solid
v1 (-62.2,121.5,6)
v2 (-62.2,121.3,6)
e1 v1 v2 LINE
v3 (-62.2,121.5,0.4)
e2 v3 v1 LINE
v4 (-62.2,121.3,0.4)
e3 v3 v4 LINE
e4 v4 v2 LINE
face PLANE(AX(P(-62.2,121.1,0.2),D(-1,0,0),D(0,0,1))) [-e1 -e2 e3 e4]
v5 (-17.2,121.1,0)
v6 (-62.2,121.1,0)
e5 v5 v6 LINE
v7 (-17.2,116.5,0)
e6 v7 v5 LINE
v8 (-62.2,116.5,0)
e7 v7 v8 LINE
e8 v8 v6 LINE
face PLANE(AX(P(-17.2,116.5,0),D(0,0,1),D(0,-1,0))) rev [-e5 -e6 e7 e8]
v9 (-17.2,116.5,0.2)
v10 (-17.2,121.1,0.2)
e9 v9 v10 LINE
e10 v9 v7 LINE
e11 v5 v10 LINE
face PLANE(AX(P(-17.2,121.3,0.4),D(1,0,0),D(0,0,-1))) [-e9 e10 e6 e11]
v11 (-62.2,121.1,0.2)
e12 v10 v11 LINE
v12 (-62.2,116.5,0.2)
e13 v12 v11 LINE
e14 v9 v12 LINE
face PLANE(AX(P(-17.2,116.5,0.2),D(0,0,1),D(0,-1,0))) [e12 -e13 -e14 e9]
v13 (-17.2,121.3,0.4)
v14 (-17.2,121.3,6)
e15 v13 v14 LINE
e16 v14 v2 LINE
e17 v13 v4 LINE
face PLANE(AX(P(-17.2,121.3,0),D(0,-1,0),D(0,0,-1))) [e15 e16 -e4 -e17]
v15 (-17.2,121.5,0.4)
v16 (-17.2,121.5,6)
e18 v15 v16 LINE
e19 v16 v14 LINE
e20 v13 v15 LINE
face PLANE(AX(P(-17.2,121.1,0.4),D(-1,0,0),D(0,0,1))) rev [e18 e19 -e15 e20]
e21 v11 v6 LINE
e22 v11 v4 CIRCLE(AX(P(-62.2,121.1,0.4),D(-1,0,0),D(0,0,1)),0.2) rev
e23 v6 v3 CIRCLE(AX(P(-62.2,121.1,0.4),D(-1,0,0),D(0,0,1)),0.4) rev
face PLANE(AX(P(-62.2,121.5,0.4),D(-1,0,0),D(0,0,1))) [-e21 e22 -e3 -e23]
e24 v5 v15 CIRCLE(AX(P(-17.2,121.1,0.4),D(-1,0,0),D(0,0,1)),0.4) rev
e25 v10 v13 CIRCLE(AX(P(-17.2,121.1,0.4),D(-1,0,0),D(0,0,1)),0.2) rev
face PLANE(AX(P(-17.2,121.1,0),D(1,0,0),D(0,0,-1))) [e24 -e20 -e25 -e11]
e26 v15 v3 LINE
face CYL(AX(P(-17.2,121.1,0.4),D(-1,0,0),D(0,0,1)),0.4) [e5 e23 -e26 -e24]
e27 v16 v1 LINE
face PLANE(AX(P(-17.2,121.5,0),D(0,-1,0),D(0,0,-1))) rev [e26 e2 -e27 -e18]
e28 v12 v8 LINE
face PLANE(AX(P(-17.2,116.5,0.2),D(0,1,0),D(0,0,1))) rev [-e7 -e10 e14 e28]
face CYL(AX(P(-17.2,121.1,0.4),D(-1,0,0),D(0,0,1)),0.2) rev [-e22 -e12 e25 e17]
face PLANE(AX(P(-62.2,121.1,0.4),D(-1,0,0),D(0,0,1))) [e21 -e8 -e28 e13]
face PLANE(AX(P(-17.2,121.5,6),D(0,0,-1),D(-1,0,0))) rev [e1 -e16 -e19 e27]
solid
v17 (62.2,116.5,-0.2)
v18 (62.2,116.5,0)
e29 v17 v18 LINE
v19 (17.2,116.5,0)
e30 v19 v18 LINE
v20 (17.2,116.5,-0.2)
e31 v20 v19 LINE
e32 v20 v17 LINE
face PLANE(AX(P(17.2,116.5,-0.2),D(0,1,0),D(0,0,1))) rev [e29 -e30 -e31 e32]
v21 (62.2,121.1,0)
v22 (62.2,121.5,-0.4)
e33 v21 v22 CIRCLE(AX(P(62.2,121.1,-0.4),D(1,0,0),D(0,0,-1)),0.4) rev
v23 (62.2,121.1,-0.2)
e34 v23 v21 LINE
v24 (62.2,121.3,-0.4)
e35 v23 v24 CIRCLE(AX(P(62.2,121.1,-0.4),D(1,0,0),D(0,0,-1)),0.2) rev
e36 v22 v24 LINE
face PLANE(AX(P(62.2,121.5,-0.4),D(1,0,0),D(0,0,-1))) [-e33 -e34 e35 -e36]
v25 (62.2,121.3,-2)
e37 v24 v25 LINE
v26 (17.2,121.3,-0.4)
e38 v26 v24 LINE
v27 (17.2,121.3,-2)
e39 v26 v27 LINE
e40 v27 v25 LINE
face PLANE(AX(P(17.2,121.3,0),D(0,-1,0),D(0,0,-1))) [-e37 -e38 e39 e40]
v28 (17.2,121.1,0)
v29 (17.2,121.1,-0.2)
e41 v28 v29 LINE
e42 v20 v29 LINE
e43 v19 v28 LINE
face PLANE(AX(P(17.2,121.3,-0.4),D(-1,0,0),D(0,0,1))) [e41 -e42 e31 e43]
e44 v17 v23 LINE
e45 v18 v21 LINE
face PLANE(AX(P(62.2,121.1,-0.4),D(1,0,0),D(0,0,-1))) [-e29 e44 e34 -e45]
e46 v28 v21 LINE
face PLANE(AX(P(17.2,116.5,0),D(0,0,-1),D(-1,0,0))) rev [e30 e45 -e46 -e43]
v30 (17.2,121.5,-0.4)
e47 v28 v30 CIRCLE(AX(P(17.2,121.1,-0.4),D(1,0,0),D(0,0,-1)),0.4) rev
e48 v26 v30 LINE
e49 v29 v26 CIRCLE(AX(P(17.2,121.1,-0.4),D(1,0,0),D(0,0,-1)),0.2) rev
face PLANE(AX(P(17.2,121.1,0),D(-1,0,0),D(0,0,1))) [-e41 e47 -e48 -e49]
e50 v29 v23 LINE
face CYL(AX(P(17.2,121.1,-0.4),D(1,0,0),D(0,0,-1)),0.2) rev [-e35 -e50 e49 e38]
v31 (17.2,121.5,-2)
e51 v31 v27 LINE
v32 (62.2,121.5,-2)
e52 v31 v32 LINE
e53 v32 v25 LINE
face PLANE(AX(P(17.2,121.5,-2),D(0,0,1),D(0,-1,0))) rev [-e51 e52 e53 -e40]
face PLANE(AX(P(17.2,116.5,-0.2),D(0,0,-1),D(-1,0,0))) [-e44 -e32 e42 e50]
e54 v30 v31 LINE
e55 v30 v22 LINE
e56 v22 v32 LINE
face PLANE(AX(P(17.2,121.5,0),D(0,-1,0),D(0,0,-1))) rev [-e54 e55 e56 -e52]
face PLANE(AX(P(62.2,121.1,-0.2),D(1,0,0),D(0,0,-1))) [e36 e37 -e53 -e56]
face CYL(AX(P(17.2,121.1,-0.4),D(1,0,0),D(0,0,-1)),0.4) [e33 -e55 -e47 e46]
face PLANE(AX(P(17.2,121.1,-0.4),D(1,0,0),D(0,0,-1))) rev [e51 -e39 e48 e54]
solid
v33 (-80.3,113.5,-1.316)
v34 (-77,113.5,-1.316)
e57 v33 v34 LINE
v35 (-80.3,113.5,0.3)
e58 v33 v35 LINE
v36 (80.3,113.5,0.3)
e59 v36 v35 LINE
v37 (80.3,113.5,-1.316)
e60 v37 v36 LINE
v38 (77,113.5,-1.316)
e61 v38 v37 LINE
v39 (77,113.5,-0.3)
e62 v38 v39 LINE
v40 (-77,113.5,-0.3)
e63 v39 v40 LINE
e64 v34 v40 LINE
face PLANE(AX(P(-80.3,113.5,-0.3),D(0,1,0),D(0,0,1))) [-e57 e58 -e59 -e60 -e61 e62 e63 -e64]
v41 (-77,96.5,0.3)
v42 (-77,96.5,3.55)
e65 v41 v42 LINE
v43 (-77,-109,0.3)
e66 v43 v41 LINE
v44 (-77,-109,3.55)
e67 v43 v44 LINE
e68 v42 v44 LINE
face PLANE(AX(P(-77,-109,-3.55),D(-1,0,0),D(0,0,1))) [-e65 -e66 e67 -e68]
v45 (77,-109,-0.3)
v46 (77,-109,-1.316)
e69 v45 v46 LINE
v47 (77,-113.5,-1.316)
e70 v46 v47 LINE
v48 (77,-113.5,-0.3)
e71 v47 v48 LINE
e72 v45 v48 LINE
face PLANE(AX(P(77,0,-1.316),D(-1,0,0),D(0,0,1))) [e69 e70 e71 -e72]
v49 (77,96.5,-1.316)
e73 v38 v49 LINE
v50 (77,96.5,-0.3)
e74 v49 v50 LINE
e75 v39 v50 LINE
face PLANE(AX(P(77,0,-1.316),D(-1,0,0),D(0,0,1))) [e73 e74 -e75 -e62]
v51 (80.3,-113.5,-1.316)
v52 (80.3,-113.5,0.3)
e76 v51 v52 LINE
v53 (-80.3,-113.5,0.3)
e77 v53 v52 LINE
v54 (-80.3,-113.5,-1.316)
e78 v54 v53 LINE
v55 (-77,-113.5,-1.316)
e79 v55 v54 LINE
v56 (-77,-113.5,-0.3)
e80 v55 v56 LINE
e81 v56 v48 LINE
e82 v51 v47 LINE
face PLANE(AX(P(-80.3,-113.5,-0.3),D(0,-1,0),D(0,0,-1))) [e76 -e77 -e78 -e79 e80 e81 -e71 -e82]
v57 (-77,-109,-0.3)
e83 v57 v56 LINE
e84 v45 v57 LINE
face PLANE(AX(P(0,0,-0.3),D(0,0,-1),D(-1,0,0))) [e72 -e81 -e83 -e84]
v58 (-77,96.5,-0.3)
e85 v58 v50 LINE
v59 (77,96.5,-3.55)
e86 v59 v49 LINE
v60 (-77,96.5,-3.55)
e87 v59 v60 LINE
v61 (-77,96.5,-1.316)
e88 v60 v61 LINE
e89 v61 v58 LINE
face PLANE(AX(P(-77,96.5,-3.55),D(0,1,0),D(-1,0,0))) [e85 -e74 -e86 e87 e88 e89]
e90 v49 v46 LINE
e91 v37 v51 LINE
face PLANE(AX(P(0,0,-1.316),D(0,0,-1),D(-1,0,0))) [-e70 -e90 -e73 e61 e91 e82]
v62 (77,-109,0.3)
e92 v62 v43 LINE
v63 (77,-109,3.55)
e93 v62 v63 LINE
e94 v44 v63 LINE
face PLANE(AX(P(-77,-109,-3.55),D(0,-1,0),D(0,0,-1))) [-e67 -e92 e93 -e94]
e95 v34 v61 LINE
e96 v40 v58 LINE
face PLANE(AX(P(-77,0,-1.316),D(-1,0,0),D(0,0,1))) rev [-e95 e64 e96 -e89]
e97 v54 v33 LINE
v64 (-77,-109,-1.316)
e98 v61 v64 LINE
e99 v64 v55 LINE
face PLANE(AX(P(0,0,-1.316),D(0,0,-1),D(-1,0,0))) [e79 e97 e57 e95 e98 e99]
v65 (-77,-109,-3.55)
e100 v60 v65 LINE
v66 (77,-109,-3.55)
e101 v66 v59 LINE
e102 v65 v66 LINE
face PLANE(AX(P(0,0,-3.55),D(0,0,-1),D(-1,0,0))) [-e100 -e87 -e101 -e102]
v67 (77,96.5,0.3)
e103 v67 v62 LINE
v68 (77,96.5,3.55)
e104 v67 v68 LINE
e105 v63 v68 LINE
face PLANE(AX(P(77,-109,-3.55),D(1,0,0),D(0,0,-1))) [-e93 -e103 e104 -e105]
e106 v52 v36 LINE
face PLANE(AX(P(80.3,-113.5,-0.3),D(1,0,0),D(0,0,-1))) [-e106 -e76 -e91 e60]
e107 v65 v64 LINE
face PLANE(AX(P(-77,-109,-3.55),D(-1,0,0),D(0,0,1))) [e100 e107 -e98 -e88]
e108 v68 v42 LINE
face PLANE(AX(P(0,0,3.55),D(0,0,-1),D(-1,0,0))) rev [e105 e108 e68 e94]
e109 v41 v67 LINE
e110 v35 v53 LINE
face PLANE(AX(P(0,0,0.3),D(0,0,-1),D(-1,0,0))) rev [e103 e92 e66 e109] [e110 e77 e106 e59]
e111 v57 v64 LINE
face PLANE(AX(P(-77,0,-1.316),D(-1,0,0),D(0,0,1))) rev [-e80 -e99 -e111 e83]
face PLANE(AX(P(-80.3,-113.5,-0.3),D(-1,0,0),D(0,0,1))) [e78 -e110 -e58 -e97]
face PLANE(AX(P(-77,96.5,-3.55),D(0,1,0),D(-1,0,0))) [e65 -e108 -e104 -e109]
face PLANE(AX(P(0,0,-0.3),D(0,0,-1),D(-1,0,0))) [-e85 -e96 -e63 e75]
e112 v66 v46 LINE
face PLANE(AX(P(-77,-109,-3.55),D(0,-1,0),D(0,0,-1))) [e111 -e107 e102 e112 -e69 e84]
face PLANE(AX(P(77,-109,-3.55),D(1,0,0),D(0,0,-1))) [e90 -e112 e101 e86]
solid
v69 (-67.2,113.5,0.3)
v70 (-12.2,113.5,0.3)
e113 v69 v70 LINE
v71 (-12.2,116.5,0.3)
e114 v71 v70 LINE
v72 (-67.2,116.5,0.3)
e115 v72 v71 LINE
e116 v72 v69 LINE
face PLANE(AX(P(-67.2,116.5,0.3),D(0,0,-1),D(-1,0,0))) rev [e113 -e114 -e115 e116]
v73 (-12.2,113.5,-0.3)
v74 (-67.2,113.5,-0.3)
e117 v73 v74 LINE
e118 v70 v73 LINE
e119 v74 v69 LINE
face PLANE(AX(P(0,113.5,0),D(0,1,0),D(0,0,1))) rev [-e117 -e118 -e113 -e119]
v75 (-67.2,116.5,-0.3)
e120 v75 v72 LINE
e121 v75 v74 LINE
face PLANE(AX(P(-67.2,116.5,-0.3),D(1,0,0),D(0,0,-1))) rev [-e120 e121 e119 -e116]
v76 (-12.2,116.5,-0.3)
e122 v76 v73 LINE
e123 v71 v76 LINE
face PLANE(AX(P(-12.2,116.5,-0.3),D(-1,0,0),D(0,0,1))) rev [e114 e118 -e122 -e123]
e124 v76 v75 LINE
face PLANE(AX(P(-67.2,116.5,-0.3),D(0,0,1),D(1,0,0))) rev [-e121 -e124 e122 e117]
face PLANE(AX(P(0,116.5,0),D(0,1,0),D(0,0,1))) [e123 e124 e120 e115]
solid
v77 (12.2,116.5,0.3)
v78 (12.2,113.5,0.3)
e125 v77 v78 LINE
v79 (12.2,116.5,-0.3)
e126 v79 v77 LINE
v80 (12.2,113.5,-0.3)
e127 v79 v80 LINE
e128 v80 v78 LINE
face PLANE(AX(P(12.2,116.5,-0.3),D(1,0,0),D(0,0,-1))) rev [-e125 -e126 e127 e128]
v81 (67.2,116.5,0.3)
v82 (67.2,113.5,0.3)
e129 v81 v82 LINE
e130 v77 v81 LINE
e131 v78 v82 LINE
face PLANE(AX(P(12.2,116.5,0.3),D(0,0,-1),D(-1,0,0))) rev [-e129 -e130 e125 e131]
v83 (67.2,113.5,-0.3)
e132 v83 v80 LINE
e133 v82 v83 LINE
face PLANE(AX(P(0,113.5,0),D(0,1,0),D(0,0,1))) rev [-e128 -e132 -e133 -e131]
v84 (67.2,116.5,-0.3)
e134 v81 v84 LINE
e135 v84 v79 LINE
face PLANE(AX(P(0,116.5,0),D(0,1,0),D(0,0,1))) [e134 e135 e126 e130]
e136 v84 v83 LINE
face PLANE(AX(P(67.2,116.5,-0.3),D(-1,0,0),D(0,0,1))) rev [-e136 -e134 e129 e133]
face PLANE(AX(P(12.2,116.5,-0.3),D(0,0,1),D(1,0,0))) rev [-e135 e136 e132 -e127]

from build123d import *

# Parameters (mm, degrees)
INSULATION_DEPTH      = 0.3
INSULATION_DEPTH_BACK = 0.3
SKETCH1_W             = 160.6
SKETCH1_H             = 227
MAIN_BODY_DEPTH       = 3.55
MAIN_BODY_DEPTH_BACK  = 3.55
SKETCH2_W             = 154
SKETCH2_H             = 205.5
SIDE_FOLDS_DEPTH      = 1.016
SKETCH114_W           = 55
SKETCH114_H           = 0.6
BOSS_EXTRUDE1_DEPTH   = 3
BOSS_EXTRUDE1_2_DEPTH = 3
BASE_FLANGE1_DEPTH    = 45
BASE_FLANGE2_DEPTH    = 45


# Sheet-metal steps are written as plain solids
with BuildPart() as part:
    # Sketch1 → Insulation (new, two sides: drawn at the far end of the back side and taken through both)
    with BuildSketch(Plane.XY.offset(-INSULATION_DEPTH_BACK)):
        Rectangle(SKETCH1_W, SKETCH1_H)
    extrude(amount=INSULATION_DEPTH + INSULATION_DEPTH_BACK)

    # Sketch2 → Main Body (add, two sides: drawn at the far end of the back side and taken through both)
    with BuildSketch(Plane.XY.offset(-MAIN_BODY_DEPTH_BACK)):
        with Locations((0, -6.25)):
            Rectangle(SKETCH2_W, SKETCH2_H)
    extrude(amount=MAIN_BODY_DEPTH + MAIN_BODY_DEPTH_BACK)

    # Sketch5 → Side Folds (add)
    with BuildSketch(Plane(origin=(0, 0, -0.3), x_dir=(-1, 0, 0), z_dir=(0, 0, -1))):
        Polygon((-77, -109), (-77, 96.5), (-77, 113.5), (-80.3, 113.5), (-80.3, -113.5), (-77, -113.5), align=None)
        Polygon((77, 113.5), (77, 96.5), (77, -109), (77, -113.5), (80.3, -113.5), (80.3, 113.5), align=None)
    extrude(amount=SIDE_FOLDS_DEPTH)


with BuildPart() as body_2:
    # Sketch114 → Boss-Extrude1 (new body)
    with BuildSketch(Plane(origin=(0, 113.5, 0), x_dir=(1, 0, 0), z_dir=(0, 1, 0))):
        with Locations((-39.7, 0)):
            Rectangle(SKETCH114_W, SKETCH114_H)
    extrude(amount=BOSS_EXTRUDE1_DEPTH)


with BuildPart() as body_3:
    # Sketch114 → Boss-Extrude1 2 (new body)
    with BuildSketch(Plane(origin=(0, 113.5, 0), x_dir=(1, 0, 0), z_dir=(0, 1, 0))):
        with Locations((39.7, 0)):
            Rectangle(SKETCH114_W, SKETCH114_H)
    extrude(amount=BOSS_EXTRUDE1_2_DEPTH)


with BuildPart() as body_4:
    # Sketch115 → Base-Flange1 (new body)
    with BuildSketch(Plane.ZY.offset(62.2)):
        with BuildLine():
            Line((0, 116.5), (0, 121.1))
            ThreePointArc((0, 121.1), (0.117157288, 121.382842712), (0.4, 121.5))
            Line((0.4, 121.5), (6, 121.5))
            Line((6, 121.5), (6, 121.3))
            Line((6, 121.3), (0.4, 121.3))
            ThreePointArc((0.4, 121.3), (0.258578644, 121.241421356), (0.2, 121.1))
            Line((0.2, 121.1), (0.2, 116.5))
            Line((0.2, 116.5), (0, 116.5))
        make_face()
    extrude(amount=-BASE_FLANGE1_DEPTH)


with BuildPart() as body_5:
    # Sketch120 → Base-Flange2 (new body)
    with BuildSketch(Plane(origin=(62.2, 0, 0), x_dir=(0, 0, -1), z_dir=(1, 0, 0))):
        with BuildLine():
            Line((0, 116.5), (0, 121.1))
            ThreePointArc((0, 121.1), (0.117157288, 121.382842712), (0.4, 121.5))
            Line((0.4, 121.5), (2, 121.5))
            Line((2, 121.5), (2, 121.3))
            Line((2, 121.3), (0.4, 121.3))
            ThreePointArc((0.4, 121.3), (0.258578644, 121.241421356), (0.2, 121.1))
            Line((0.2, 121.1), (0.2, 116.5))
            Line((0.2, 116.5), (0, 116.5))
        make_face()
    extrude(amount=-BASE_FLANGE2_DEPTH)


solid = Compound([part.part, body_2.part, body_3.part, body_4.part, body_5.part])
